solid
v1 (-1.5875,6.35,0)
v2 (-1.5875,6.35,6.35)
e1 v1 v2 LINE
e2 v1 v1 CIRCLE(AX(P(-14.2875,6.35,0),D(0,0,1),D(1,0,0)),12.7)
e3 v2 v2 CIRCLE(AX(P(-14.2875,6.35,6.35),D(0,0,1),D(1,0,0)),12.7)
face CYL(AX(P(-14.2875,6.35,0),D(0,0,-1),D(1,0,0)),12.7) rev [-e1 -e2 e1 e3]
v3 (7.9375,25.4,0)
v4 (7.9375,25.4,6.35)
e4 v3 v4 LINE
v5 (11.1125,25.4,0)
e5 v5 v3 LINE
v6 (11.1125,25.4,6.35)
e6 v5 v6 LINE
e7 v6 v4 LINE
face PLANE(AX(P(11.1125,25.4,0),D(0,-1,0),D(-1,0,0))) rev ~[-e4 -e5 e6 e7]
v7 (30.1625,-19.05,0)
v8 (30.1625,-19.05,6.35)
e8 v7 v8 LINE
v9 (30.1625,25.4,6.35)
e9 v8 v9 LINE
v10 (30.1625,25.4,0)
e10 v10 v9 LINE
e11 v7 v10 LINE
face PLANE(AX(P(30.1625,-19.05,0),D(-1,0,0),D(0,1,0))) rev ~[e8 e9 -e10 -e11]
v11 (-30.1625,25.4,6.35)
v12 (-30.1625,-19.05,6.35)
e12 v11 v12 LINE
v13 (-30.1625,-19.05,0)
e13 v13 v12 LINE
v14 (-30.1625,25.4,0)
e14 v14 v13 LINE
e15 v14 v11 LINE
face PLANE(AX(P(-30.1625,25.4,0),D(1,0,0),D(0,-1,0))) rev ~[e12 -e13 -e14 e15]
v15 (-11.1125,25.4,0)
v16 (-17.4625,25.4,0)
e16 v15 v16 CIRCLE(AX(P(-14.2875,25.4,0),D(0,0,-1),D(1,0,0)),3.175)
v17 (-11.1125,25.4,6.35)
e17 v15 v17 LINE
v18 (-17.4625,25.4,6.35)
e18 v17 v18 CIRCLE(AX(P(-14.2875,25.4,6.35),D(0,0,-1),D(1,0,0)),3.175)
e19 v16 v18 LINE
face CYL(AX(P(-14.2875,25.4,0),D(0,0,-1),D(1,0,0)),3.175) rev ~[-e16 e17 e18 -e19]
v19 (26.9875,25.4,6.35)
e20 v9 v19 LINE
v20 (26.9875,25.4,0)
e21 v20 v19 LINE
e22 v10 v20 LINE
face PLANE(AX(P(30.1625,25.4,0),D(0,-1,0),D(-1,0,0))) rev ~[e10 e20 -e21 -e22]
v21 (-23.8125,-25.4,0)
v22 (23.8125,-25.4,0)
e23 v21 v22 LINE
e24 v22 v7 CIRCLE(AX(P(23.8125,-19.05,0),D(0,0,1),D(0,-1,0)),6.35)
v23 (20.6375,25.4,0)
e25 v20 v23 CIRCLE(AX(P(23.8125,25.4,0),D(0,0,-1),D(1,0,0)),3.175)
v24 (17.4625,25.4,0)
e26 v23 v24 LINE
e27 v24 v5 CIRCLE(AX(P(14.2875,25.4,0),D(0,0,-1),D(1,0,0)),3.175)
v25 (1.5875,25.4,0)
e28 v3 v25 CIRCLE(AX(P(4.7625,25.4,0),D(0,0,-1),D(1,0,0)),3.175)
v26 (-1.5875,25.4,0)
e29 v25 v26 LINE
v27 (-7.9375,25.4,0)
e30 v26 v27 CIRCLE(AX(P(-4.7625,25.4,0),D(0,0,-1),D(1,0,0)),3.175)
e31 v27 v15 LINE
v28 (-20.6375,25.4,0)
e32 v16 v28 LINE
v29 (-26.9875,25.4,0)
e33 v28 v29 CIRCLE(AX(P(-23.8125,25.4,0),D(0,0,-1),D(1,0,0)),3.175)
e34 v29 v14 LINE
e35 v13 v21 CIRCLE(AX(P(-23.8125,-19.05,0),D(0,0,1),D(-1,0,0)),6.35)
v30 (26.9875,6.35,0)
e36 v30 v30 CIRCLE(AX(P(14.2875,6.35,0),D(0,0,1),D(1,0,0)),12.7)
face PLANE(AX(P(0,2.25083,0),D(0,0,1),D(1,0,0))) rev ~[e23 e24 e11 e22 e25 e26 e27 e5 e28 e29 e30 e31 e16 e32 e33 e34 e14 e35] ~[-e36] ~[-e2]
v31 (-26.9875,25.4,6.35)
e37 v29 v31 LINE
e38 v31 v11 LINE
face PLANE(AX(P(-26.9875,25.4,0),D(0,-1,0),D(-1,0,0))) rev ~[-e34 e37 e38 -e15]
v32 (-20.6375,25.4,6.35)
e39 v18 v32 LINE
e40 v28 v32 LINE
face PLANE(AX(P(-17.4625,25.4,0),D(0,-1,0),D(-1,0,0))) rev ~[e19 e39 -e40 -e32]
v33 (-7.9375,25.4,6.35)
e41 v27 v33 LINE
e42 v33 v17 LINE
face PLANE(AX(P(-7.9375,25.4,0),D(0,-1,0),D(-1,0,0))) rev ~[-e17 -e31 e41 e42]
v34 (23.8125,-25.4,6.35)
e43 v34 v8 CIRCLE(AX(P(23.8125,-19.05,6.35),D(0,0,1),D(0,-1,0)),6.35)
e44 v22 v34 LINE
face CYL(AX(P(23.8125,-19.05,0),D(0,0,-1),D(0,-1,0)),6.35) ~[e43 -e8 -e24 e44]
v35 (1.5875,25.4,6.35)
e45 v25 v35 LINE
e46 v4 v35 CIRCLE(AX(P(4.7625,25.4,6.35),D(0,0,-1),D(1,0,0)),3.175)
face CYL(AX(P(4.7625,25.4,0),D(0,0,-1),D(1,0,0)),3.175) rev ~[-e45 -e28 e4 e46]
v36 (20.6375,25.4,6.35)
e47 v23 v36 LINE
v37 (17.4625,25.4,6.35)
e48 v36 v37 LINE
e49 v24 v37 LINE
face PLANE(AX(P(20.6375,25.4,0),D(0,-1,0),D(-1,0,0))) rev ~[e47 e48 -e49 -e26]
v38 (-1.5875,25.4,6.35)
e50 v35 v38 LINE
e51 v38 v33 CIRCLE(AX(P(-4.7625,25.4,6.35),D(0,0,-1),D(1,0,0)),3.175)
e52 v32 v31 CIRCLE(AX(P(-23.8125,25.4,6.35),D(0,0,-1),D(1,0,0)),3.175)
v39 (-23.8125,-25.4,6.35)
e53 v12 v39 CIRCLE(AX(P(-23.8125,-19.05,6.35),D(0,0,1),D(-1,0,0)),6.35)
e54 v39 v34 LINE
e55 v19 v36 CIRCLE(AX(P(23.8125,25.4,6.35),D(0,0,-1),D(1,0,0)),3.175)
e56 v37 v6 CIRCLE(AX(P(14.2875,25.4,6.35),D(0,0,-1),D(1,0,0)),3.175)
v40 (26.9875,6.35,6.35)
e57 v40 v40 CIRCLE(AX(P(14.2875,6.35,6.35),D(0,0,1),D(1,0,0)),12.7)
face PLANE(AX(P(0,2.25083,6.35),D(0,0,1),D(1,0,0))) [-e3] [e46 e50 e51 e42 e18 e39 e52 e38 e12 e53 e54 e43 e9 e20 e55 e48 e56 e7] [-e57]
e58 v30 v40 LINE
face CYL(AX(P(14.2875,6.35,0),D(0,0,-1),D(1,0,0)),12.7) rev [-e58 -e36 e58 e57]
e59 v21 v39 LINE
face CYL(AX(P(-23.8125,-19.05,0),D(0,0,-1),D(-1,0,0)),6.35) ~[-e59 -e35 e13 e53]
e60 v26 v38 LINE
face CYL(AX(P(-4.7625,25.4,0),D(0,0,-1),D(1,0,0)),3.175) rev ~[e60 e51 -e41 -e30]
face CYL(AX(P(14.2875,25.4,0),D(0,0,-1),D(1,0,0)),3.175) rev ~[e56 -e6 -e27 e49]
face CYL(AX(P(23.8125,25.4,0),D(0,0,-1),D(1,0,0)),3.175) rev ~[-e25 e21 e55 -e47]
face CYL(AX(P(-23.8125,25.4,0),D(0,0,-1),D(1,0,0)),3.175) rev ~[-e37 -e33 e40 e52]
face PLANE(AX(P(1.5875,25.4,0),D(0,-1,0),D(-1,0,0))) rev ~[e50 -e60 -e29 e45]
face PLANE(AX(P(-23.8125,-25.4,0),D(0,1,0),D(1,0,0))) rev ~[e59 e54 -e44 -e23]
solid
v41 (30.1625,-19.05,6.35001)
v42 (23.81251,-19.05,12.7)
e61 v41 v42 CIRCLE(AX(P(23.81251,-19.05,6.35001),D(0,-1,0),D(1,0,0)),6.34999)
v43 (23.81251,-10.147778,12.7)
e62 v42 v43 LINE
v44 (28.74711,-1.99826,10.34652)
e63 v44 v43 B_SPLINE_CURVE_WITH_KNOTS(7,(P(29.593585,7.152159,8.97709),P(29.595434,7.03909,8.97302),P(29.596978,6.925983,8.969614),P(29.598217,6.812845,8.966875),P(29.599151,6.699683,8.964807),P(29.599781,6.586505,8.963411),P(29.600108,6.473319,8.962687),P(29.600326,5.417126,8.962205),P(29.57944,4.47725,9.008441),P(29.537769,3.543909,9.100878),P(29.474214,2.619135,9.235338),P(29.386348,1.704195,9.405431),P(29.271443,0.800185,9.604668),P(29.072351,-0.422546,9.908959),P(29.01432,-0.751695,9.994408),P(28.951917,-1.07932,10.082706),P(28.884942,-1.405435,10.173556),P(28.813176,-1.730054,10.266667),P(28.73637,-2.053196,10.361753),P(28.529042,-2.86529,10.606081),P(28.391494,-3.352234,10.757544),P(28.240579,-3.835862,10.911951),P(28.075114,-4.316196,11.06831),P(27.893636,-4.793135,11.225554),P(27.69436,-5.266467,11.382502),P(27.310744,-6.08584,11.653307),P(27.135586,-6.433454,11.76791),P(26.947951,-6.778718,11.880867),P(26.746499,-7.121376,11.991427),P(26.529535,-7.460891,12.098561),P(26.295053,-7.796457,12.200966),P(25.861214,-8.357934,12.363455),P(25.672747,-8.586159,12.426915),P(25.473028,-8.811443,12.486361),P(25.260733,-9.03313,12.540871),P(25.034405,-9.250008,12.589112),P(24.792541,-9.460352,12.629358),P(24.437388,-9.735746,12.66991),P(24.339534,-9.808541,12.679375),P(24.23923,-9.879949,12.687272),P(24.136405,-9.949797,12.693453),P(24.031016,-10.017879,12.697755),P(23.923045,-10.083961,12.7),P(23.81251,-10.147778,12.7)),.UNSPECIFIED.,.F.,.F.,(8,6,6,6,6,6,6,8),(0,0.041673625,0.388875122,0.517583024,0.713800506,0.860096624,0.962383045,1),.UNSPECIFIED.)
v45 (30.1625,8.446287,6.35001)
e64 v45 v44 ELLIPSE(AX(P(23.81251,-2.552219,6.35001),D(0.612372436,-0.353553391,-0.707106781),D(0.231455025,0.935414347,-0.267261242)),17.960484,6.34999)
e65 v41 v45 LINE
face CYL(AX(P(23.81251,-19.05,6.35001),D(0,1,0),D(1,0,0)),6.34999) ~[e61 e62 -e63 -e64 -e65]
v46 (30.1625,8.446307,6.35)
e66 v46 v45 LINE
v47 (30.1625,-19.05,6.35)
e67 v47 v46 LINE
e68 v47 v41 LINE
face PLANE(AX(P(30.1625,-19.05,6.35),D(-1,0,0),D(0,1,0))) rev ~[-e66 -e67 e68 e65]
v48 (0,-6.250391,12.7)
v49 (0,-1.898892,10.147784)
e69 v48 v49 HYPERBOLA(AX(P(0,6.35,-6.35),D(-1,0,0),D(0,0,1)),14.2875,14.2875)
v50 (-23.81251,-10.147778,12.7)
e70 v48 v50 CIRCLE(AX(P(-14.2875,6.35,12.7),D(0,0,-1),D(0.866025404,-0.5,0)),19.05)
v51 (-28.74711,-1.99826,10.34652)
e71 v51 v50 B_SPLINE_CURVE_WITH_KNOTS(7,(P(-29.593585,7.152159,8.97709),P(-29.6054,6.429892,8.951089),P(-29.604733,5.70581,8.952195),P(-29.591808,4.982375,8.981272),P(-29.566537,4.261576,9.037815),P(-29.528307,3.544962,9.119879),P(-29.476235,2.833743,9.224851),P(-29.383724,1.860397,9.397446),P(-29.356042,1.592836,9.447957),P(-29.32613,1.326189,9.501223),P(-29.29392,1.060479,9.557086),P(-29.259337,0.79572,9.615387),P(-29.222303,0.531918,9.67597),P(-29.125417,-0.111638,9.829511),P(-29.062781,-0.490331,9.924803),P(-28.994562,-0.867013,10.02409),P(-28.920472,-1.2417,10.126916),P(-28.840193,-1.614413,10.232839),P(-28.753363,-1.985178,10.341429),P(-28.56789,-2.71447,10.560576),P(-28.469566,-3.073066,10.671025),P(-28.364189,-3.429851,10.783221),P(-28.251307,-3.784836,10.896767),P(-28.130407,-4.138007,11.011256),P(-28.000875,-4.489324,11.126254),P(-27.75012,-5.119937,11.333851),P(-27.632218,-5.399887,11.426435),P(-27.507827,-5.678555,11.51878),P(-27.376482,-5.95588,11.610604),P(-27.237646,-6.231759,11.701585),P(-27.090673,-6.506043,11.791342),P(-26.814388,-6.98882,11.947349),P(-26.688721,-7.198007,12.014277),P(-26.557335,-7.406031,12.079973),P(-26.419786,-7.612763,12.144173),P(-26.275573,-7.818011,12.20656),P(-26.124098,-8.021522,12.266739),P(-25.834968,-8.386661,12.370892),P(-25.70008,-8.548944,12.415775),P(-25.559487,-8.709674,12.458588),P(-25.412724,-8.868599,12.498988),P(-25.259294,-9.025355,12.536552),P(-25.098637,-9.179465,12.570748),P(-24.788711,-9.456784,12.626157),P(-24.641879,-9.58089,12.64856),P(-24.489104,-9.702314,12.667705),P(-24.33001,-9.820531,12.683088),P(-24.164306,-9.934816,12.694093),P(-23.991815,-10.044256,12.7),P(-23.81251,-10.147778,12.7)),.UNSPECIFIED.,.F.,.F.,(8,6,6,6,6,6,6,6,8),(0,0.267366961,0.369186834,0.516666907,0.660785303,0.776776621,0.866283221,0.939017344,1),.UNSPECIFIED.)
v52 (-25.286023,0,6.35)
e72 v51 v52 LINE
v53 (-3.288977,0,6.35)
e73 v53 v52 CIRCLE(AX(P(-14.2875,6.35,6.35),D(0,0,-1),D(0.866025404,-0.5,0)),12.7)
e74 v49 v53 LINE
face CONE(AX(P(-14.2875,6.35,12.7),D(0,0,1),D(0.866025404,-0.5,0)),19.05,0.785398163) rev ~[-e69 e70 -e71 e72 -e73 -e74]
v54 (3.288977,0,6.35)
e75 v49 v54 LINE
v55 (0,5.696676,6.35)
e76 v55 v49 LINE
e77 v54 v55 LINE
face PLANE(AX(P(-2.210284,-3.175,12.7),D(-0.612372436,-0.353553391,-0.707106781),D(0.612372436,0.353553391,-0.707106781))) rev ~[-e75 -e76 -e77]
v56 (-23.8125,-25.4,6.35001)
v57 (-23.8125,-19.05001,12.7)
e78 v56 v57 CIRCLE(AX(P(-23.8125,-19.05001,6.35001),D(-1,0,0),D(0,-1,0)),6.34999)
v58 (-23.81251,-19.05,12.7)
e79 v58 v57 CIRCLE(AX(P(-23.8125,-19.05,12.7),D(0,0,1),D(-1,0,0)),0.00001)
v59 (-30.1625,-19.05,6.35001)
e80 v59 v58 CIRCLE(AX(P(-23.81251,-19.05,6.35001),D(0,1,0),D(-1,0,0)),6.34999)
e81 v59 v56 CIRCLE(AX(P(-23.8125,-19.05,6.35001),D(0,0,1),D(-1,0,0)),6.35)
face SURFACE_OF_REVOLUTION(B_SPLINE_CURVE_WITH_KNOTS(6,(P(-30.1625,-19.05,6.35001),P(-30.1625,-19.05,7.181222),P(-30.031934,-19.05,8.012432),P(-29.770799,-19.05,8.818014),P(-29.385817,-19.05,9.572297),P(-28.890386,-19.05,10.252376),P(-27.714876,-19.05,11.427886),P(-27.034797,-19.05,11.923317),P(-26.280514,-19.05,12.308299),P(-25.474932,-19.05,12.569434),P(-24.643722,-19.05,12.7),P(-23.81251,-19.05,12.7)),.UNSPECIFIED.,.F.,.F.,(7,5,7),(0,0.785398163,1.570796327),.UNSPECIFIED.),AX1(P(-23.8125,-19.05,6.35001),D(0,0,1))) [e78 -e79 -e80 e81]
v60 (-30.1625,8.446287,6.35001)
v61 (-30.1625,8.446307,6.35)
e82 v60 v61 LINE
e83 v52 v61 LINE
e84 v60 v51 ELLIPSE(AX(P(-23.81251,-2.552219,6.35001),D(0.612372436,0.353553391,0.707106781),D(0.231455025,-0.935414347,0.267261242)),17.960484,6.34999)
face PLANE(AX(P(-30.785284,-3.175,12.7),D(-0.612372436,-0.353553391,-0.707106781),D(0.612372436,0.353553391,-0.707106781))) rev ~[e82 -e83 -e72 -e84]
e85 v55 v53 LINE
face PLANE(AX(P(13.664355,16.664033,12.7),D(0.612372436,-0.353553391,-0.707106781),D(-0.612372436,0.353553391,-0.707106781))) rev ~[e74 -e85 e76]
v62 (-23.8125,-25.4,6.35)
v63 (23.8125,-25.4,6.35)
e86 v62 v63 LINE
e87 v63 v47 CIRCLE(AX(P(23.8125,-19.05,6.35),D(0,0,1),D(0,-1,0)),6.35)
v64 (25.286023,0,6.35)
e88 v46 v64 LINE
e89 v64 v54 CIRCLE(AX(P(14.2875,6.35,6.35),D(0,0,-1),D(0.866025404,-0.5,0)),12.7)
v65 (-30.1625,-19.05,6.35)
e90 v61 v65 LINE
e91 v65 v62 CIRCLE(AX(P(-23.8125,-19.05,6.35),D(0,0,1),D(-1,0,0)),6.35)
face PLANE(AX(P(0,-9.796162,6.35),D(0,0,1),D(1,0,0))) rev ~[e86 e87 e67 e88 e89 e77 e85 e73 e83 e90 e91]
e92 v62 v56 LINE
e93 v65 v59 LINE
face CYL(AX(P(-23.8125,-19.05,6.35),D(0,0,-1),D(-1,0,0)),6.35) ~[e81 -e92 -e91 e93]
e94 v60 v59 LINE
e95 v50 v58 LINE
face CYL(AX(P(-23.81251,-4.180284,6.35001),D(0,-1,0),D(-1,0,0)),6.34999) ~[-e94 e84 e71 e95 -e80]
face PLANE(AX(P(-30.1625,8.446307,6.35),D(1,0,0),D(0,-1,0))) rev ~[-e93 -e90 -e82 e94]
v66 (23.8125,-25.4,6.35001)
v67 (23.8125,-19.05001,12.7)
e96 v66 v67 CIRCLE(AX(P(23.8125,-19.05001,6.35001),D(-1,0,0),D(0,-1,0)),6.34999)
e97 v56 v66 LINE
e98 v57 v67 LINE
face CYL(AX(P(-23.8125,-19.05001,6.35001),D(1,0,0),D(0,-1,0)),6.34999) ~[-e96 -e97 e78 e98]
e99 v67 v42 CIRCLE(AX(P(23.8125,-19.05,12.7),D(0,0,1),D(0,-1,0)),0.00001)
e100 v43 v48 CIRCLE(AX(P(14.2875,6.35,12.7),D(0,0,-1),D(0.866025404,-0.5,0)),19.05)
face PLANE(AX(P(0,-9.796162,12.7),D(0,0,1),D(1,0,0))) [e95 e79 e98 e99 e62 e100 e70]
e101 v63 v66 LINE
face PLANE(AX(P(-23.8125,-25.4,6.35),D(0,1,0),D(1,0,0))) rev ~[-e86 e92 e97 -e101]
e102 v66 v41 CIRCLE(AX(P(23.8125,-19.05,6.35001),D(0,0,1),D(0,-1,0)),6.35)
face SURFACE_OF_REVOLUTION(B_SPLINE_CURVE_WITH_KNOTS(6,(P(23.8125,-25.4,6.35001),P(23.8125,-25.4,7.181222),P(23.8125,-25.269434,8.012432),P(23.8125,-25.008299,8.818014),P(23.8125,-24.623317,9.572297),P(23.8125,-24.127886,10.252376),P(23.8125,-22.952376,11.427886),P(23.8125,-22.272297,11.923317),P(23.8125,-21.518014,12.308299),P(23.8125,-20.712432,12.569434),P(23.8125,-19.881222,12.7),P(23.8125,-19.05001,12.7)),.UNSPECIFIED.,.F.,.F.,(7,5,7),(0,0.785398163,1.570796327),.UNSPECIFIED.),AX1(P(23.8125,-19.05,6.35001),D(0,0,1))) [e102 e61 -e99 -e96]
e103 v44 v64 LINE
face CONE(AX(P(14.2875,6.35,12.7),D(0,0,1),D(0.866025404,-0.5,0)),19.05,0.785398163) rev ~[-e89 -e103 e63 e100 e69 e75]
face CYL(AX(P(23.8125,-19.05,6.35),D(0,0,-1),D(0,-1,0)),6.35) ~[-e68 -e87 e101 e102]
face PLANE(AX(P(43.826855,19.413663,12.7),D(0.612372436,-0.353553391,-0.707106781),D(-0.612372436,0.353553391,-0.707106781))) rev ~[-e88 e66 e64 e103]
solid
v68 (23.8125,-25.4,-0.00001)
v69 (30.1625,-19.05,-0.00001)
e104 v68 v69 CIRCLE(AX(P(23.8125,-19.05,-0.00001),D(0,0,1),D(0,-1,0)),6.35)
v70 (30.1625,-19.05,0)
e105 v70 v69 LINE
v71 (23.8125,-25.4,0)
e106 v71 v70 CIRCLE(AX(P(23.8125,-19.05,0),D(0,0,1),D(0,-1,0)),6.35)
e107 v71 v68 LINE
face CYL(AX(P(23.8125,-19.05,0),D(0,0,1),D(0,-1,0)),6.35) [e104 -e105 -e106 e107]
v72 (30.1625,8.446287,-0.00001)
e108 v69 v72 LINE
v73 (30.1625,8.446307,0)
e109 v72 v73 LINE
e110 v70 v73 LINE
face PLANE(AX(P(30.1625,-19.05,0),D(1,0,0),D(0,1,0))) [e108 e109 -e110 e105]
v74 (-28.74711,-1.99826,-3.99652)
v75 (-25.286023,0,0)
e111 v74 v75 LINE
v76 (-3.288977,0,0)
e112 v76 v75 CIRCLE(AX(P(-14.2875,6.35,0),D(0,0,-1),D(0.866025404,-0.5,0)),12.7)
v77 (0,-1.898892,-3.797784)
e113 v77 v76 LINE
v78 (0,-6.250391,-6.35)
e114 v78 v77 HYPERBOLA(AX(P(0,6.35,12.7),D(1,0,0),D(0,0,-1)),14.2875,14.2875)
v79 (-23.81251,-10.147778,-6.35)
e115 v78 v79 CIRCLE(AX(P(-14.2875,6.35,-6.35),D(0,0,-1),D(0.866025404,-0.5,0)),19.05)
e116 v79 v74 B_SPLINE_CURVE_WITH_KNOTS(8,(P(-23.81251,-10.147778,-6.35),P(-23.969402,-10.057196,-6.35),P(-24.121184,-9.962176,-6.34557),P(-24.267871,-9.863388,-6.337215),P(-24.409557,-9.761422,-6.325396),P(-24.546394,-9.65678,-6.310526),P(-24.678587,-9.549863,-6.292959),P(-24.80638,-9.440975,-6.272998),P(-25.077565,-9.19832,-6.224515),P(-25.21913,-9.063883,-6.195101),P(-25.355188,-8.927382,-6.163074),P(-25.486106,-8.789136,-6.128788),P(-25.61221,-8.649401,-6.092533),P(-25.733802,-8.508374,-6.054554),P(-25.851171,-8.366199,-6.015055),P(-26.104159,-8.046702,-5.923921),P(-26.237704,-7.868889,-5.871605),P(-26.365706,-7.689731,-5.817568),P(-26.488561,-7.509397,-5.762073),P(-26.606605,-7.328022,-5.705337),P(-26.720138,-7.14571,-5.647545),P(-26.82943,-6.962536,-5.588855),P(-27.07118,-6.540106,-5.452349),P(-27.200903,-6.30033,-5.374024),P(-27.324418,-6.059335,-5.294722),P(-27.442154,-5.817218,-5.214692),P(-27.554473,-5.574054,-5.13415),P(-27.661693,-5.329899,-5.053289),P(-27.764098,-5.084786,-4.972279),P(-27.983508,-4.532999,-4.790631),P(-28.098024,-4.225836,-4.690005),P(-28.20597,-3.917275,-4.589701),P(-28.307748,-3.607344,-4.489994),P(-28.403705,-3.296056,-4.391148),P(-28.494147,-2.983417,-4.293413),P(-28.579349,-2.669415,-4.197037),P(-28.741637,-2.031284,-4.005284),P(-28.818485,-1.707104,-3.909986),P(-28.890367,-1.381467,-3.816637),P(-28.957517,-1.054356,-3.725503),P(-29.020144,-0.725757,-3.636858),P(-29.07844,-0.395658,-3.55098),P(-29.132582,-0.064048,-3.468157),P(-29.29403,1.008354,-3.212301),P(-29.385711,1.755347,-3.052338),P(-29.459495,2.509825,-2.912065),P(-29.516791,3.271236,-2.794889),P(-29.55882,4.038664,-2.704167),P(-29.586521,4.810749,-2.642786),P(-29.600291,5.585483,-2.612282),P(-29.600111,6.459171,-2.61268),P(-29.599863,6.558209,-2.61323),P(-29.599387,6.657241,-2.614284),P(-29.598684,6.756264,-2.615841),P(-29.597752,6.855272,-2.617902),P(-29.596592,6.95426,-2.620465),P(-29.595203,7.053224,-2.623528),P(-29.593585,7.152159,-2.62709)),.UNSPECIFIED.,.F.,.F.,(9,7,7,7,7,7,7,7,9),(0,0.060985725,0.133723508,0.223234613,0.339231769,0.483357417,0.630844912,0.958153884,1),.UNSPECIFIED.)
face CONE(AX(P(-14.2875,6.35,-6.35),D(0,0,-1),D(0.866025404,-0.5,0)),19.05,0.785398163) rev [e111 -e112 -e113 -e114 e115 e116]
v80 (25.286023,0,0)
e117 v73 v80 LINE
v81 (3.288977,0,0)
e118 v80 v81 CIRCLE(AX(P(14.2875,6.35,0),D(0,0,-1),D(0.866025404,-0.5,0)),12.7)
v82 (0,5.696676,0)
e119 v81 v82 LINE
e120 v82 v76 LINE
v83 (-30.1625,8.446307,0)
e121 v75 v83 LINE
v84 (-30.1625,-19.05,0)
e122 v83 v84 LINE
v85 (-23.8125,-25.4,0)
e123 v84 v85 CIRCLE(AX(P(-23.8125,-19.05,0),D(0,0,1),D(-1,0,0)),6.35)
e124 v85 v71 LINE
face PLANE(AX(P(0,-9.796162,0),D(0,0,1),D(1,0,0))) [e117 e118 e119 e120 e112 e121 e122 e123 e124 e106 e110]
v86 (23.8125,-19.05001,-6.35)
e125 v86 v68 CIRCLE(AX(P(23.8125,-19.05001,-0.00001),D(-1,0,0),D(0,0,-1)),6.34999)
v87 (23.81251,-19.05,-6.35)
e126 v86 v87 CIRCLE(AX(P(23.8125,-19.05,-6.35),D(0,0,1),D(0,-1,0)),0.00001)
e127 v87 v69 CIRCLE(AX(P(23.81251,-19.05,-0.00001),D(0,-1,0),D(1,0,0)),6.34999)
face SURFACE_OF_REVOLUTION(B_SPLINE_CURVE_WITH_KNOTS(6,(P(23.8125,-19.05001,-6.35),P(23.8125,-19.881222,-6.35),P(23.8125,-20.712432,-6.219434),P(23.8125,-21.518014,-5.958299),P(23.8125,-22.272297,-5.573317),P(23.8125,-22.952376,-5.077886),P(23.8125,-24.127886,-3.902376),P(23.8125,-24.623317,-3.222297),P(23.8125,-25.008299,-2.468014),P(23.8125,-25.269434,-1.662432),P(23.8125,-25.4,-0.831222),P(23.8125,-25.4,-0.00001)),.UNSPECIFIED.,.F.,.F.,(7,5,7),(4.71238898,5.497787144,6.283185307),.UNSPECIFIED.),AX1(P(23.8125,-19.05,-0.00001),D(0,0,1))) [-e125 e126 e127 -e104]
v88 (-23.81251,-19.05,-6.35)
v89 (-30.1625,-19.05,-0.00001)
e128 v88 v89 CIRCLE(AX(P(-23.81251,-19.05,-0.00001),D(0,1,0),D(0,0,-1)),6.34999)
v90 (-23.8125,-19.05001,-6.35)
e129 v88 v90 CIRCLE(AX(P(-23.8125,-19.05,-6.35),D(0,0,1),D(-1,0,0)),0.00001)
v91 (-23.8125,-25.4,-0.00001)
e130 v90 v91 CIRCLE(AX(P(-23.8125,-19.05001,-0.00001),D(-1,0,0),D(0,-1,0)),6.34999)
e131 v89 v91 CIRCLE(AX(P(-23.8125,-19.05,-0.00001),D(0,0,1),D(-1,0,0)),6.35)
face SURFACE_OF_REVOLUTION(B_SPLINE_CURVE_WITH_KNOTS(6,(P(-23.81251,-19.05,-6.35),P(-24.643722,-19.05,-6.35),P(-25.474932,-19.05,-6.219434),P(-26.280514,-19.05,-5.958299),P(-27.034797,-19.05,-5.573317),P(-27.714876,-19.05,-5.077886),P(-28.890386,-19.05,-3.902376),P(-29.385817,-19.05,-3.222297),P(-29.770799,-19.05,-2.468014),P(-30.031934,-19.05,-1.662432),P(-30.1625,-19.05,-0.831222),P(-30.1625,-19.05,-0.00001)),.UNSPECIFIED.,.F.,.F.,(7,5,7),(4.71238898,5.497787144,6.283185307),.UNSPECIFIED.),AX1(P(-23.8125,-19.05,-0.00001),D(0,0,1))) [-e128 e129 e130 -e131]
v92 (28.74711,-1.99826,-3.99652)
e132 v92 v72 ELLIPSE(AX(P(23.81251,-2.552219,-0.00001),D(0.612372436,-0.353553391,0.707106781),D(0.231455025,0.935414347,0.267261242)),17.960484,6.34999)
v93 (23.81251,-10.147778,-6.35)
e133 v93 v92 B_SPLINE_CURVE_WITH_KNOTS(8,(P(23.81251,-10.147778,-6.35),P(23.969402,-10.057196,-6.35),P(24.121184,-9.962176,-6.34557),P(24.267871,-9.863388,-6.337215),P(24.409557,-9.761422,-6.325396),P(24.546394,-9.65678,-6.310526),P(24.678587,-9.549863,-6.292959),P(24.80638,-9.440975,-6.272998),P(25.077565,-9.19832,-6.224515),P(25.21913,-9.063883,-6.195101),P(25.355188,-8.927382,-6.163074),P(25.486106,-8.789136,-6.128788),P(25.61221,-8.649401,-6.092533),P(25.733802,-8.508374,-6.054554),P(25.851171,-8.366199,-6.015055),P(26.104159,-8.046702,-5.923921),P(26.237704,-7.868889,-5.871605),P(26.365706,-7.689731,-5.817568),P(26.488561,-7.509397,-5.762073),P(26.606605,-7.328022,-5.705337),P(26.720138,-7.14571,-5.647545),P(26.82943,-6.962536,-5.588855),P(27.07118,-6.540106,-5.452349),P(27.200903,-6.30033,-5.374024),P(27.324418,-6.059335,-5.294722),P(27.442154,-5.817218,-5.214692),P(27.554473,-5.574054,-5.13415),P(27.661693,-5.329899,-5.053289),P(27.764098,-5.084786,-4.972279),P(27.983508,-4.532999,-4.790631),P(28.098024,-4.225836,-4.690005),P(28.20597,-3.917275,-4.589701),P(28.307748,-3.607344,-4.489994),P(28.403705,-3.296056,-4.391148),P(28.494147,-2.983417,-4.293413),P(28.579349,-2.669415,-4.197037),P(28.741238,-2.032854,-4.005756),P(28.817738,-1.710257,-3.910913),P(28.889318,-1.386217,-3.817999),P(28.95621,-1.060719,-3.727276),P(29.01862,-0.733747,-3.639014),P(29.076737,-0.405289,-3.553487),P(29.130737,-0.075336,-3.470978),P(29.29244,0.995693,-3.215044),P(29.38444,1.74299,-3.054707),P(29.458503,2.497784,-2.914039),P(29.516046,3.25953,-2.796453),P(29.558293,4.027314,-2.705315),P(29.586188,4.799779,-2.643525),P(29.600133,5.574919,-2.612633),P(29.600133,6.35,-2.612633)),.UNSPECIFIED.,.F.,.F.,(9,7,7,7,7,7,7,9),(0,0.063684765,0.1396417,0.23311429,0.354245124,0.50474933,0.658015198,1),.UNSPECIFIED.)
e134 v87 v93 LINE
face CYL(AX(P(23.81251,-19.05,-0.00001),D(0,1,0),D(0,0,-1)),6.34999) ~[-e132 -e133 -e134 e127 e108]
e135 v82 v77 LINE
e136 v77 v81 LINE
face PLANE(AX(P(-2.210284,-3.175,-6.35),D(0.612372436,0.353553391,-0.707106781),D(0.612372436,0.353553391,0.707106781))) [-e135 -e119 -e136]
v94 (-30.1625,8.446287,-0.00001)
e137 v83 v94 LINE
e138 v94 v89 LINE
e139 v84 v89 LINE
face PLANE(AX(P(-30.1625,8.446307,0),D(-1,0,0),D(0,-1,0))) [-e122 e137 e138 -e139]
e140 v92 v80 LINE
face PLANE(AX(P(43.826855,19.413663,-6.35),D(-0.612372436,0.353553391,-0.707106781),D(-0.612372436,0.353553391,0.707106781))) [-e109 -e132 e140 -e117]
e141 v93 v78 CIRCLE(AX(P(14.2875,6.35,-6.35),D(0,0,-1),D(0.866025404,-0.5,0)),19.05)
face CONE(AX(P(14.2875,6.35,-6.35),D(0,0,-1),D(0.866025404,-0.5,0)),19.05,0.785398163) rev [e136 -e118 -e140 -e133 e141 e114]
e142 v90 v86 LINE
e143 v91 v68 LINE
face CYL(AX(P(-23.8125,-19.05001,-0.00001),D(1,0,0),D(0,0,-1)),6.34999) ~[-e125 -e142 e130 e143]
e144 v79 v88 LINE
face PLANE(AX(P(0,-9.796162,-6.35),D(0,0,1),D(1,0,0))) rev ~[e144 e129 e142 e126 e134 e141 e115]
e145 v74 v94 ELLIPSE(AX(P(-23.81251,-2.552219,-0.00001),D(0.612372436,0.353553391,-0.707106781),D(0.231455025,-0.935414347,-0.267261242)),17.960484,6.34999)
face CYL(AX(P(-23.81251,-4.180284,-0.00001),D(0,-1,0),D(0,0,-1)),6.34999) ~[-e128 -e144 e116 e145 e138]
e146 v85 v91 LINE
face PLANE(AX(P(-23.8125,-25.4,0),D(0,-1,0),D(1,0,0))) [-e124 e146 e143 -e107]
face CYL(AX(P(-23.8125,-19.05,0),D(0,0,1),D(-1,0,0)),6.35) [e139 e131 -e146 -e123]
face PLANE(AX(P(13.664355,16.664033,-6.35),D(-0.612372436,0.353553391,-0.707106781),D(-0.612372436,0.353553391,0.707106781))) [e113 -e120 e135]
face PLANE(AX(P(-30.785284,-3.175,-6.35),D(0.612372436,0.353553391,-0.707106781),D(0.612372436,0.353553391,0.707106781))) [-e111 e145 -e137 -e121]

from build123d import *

# Parameters (mm, degrees)
F0_R           = 12.7
F1_DEPTH       = 6.35
F3_START       = 6.35
F3_DEPTH       = 6.35
F4_DEPTH       = 6.35
F5_T1_DEPTH    = 26.0831417175
F5_T3_DEPTH    = 22.9081417175
F5_T5_DEPTH    = 22.9081417175
F5_T7_DEPTH    = 26.0831417175
F5_T10_ANGLE   = 120
F5_T12_ANGLE   = 120
F5_2_T1_DEPTH  = 22.9081417175
F5_2_T3_DEPTH  = 26.0831417175
F5_2_T5_DEPTH  = 26.0831417175
F5_2_T7_DEPTH  = 22.9081417175
F5_2_T10_ANGLE = 120
F5_2_T12_ANGLE = 120
F6_R           = 6.34999
F6_2_R         = 6.34999


# Not quite as in the source:
# - a fillet or chamfer that OpenCascade refuses, or shapes differently, is made with other operations: its cross-section is extruded or revolved along the edge and cut away or added
# - a fillet or chamfer is up to 0.001 mm smaller than in the source, because OpenCascade refuses the exact size


with BuildPart() as f1:
    # F0 (on Top) → F1 (new body)
    with BuildSketch(Plane.XY):
        with BuildLine():
            Line((-23.8125, -25.4), (23.8125, -25.4))
            ThreePointArc((23.8125, -25.4), (28.3026280605, -23.5401280605), (30.1625, -19.05))
            Line((30.1625, -19.05), (30.1625, 25.4))
            Line((30.1625, 25.4), (26.9875, 25.4))
            ThreePointArc((26.9875, 25.4), (23.8125, 22.225), (20.6375, 25.4))
            Line((20.6375, 25.4), (17.4625, 25.4))
            ThreePointArc((17.4625, 25.4), (14.2875, 22.225), (11.1125, 25.4))
            Line((11.1125, 25.4), (7.9375, 25.4))
            ThreePointArc((7.9375, 25.4), (4.7625, 22.225), (1.5875, 25.4))
            Line((1.5875, 25.4), (-1.5875, 25.4))
            ThreePointArc((-1.5875, 25.4), (-4.7625, 22.225), (-7.9375, 25.4))
            Line((-7.9375, 25.4), (-11.1125, 25.4))
            ThreePointArc((-11.1125, 25.4), (-14.2875, 22.225), (-17.4625, 25.4))
            Line((-17.4625, 25.4), (-20.6375, 25.4))
            ThreePointArc((-20.6375, 25.4), (-23.8125, 22.225), (-26.9875, 25.4))
            Line((-26.9875, 25.4), (-30.1625, 25.4))
            Line((-30.1625, 25.4), (-30.1625, -19.05))
            ThreePointArc((-30.1625, -19.05), (-28.3026280605, -23.5401280605), (-23.8125, -25.4))
        make_face()
        with Locations((-14.2875, 6.35)):
            Circle(F0_R, mode=Mode.SUBTRACT)
        with Locations((14.2875, 6.35)):
            Circle(F0_R, mode=Mode.SUBTRACT)
    extrude(amount=F1_DEPTH)


with BuildPart() as f3:
    # F2 (on Top) → F3 (new body)
    with BuildSketch(Plane.XY.offset(F3_START)):
        with BuildLine():
            Line((-23.8125, -25.4), (23.8125, -25.4))
            ThreePointArc((23.8125, -25.4), (28.3026280605, -23.5401280605), (30.1625, -19.05))
            Line((30.1625, -19.05), (30.1625, 0))
            Line((30.1625, 0), (30.1625, 8.4463065702))
            Line((30.1625, 8.4463065702), (25.2860226281, 0))
            ThreePointArc((25.2860226281, 0), (14.2875, -6.35), (3.2889773719, 0))
            Line((3.2889773719, 0), (0, 5.6966759131))
            Line((0, 5.6966759131), (-3.2889773719, 0))
            ThreePointArc((-3.2889773719, 0), (-14.2875, -6.35), (-25.2860226281, 0))
            Line((-25.2860226281, 0), (-30.1625, 8.4463065702))
            Line((-30.1625, 8.4463065702), (-30.1625, 0))
            Line((-30.1625, 0), (-30.1625, -19.05))
            ThreePointArc((-30.1625, -19.05), (-28.3026280605, -23.5401280605), (-23.8125, -25.4))
        make_face()
    extrude(amount=F3_DEPTH)

    # F5: chamfer of 6.35 on 2 edges, made by hand

    # F5_s2 → F5_t1 (cut)
    with BuildSketch(Plane(origin=(19.3630765157, 33.5378323161, 0), x_dir=(0, 0, 1), z_dir=(-0.5, -0.8660254038, 0))):
        Polygon((12.7, -28.2483379566), (6.35, -21.8983379566), (12.7, -21.8983379566), align=None)
    extrude(amount=F5_T1_DEPTH, mode=Mode.SUBTRACT)

    # F5_s4 → F5_t3 (cut)
    with BuildSketch(Plane(origin=(0.822244343, -1.4241689783, 0), x_dir=(0, 0, 1), z_dir=(-0.5, 0.8660254038, 0))):
        Polygon((12.7, -3.5016620434), (6.35, 2.8483379566), (12.7, 2.8483379566), align=None)
    extrude(amount=F5_T3_DEPTH, mode=Mode.SUBTRACT)

    # F5_s6 → F5_t5 (cut)
    with BuildSketch(Plane(origin=(10.6318265157, 18.4148637025, 0), x_dir=(0, 0, 1), z_dir=(-0.5, -0.8660254038, 0))):
        Polygon((12.7, -3.5016620434), (6.35, 2.8483379566), (12.7, 2.8483379566), align=None)
    extrude(amount=F5_T5_DEPTH, mode=Mode.SUBTRACT)

    # F5_s8 → F5_t7 (cut)
    with BuildSketch(Plane(origin=(-6.321505657, 10.9491689783, 0), x_dir=(0, 0, 1), z_dir=(-0.5, 0.8660254038, 0))):
        Polygon((12.7, -28.2483379566), (6.35, -21.8983379566), (12.7, -21.8983379566), align=None)
    extrude(amount=F5_T7_DEPTH, mode=Mode.SUBTRACT)

    # F5_s9 → F5_t10 (revolve, cut)
    with BuildSketch(Plane(origin=(-0.822244343, -1.4241689783, 0), x_dir=(0, 0, 1), z_dir=(0.5, 0.8660254038, 0))):
        Polygon((12.7, 3.5016620434), (6.35, -2.8483379566), (12.7, -2.8483379566), align=None)
    revolve(axis=Axis((-14.2875, 6.35, 12.7), (0, 0, -1)), revolution_arc=F5_T10_ANGLE, mode=Mode.SUBTRACT)

    # F5_s11 → F5_t12 (revolve, cut)
    with BuildSketch(Plane(origin=(6.321505657, 10.9491689783, 0), x_dir=(0, 0, 1), z_dir=(0.5, 0.8660254038, 0))):
        Polygon((12.7, 28.2483379566), (6.35, 21.8983379566), (12.7, 21.8983379566), align=None)
    revolve(axis=Axis((14.2875, 6.35, 12.7), (0, 0, -1)), revolution_arc=F5_T12_ANGLE, mode=Mode.SUBTRACT)

    # F6 (radius 6.35 in the source; OpenCascade refuses exactly that, so slightly less here)
    f6_edges = [f3.edges().sort_by_distance(p)[0] for p in [
        (0, -25.4, 12.7),
        (-28.302628, -23.540128, 12.7),
        (-30.1625, -11.615142, 12.7),
        (28.302628, -23.540128, 12.7),
        (30.1625, -11.615142, 12.7),
    ]]
    fillet(f6_edges, radius=F6_R)


with BuildPart() as f4:
    # F2 (on Top) → F4 (new body)
    with BuildSketch(Plane.XY):
        with BuildLine():
            Line((-23.8125, -25.4), (23.8125, -25.4))
            ThreePointArc((23.8125, -25.4), (28.3026280605, -23.5401280605), (30.1625, -19.05))
            Line((30.1625, -19.05), (30.1625, 0))
            Line((30.1625, 0), (30.1625, 8.4463065702))
            Line((30.1625, 8.4463065702), (25.2860226281, 0))
            ThreePointArc((25.2860226281, 0), (14.2875, -6.35), (3.2889773719, 0))
            Line((3.2889773719, 0), (0, 5.6966759131))
            Line((0, 5.6966759131), (-3.2889773719, 0))
            ThreePointArc((-3.2889773719, 0), (-14.2875, -6.35), (-25.2860226281, 0))
            Line((-25.2860226281, 0), (-30.1625, 8.4463065702))
            Line((-30.1625, 8.4463065702), (-30.1625, 0))
            Line((-30.1625, 0), (-30.1625, -19.05))
            ThreePointArc((-30.1625, -19.05), (-28.3026280605, -23.5401280605), (-23.8125, -25.4))
        make_face()
    extrude(amount=-F4_DEPTH)

    # F5#2: chamfer of 6.35 on 2 edges, made by hand

    # F5_2_s2 → F5_2_t1 (cut)
    with BuildSketch(Plane(origin=(10.6318265157, 18.4148637025, 0), x_dir=(0, 0, 1), z_dir=(-0.5, -0.8660254038, 0))):
        Polygon((-6.35, -3.5016620434), (0, 2.8483379566), (-6.35, 2.8483379566), align=None)
    extrude(amount=F5_2_T1_DEPTH, mode=Mode.SUBTRACT)

    # F5_2_s4 → F5_2_t3 (cut)
    with BuildSketch(Plane(origin=(-6.321505657, 10.9491689783, 0), x_dir=(0, 0, 1), z_dir=(-0.5, 0.8660254038, 0))):
        Polygon((-6.35, -28.2483379566), (0, -21.8983379566), (-6.35, -21.8983379566), align=None)
    extrude(amount=F5_2_T3_DEPTH, mode=Mode.SUBTRACT)

    # F5_2_s6 → F5_2_t5 (cut)
    with BuildSketch(Plane(origin=(19.3630765157, 33.5378323161, 0), x_dir=(0, 0, 1), z_dir=(-0.5, -0.8660254038, 0))):
        Polygon((-6.35, -28.2483379566), (0, -21.8983379566), (-6.35, -21.8983379566), align=None)
    extrude(amount=F5_2_T5_DEPTH, mode=Mode.SUBTRACT)

    # F5_2_s8 → F5_2_t7 (cut)
    with BuildSketch(Plane(origin=(0.822244343, -1.4241689783, 0), x_dir=(0, 0, 1), z_dir=(-0.5, 0.8660254038, 0))):
        Polygon((-6.35, -3.5016620434), (0, 2.8483379566), (-6.35, 2.8483379566), align=None)
    extrude(amount=F5_2_T7_DEPTH, mode=Mode.SUBTRACT)

    # F5_2_s9 → F5_2_t10 (revolve, cut)
    with BuildSketch(Plane(origin=(6.321505657, 10.9491689783, 0), x_dir=(0, 0, 1), z_dir=(0.5, 0.8660254038, 0))):
        Polygon((-6.35, 28.2483379566), (0, 21.8983379566), (-6.35, 21.8983379566), align=None)
    revolve(axis=Axis((14.2875, 6.35, -6.35), (0, 0, -1)), revolution_arc=F5_2_T10_ANGLE, mode=Mode.SUBTRACT)

    # F5_2_s11 → F5_2_t12 (revolve, cut)
    with BuildSketch(Plane(origin=(-0.822244343, -1.4241689783, 0), x_dir=(0, 0, 1), z_dir=(0.5, 0.8660254038, 0))):
        Polygon((-6.35, 3.5016620434), (0, -2.8483379566), (-6.35, -2.8483379566), align=None)
    revolve(axis=Axis((-14.2875, 6.35, -6.35), (0, 0, -1)), revolution_arc=F5_2_T12_ANGLE, mode=Mode.SUBTRACT)

    # F6#2 (radius 6.35 in the source; OpenCascade refuses exactly that, so slightly less here)
    f6_2_edges = [f4.edges().sort_by_distance(p)[0] for p in [
        (30.1625, -11.615142, -6.35),
        (28.302628, -23.540128, -6.35),
        (0, -25.4, -6.35),
        (-28.302628, -23.540128, -6.35),
        (-30.1625, -11.615142, -6.35),
    ]]
    fillet(f6_2_edges, radius=F6_2_R)


solid = Compound([f1.part, f3.part, f4.part])
